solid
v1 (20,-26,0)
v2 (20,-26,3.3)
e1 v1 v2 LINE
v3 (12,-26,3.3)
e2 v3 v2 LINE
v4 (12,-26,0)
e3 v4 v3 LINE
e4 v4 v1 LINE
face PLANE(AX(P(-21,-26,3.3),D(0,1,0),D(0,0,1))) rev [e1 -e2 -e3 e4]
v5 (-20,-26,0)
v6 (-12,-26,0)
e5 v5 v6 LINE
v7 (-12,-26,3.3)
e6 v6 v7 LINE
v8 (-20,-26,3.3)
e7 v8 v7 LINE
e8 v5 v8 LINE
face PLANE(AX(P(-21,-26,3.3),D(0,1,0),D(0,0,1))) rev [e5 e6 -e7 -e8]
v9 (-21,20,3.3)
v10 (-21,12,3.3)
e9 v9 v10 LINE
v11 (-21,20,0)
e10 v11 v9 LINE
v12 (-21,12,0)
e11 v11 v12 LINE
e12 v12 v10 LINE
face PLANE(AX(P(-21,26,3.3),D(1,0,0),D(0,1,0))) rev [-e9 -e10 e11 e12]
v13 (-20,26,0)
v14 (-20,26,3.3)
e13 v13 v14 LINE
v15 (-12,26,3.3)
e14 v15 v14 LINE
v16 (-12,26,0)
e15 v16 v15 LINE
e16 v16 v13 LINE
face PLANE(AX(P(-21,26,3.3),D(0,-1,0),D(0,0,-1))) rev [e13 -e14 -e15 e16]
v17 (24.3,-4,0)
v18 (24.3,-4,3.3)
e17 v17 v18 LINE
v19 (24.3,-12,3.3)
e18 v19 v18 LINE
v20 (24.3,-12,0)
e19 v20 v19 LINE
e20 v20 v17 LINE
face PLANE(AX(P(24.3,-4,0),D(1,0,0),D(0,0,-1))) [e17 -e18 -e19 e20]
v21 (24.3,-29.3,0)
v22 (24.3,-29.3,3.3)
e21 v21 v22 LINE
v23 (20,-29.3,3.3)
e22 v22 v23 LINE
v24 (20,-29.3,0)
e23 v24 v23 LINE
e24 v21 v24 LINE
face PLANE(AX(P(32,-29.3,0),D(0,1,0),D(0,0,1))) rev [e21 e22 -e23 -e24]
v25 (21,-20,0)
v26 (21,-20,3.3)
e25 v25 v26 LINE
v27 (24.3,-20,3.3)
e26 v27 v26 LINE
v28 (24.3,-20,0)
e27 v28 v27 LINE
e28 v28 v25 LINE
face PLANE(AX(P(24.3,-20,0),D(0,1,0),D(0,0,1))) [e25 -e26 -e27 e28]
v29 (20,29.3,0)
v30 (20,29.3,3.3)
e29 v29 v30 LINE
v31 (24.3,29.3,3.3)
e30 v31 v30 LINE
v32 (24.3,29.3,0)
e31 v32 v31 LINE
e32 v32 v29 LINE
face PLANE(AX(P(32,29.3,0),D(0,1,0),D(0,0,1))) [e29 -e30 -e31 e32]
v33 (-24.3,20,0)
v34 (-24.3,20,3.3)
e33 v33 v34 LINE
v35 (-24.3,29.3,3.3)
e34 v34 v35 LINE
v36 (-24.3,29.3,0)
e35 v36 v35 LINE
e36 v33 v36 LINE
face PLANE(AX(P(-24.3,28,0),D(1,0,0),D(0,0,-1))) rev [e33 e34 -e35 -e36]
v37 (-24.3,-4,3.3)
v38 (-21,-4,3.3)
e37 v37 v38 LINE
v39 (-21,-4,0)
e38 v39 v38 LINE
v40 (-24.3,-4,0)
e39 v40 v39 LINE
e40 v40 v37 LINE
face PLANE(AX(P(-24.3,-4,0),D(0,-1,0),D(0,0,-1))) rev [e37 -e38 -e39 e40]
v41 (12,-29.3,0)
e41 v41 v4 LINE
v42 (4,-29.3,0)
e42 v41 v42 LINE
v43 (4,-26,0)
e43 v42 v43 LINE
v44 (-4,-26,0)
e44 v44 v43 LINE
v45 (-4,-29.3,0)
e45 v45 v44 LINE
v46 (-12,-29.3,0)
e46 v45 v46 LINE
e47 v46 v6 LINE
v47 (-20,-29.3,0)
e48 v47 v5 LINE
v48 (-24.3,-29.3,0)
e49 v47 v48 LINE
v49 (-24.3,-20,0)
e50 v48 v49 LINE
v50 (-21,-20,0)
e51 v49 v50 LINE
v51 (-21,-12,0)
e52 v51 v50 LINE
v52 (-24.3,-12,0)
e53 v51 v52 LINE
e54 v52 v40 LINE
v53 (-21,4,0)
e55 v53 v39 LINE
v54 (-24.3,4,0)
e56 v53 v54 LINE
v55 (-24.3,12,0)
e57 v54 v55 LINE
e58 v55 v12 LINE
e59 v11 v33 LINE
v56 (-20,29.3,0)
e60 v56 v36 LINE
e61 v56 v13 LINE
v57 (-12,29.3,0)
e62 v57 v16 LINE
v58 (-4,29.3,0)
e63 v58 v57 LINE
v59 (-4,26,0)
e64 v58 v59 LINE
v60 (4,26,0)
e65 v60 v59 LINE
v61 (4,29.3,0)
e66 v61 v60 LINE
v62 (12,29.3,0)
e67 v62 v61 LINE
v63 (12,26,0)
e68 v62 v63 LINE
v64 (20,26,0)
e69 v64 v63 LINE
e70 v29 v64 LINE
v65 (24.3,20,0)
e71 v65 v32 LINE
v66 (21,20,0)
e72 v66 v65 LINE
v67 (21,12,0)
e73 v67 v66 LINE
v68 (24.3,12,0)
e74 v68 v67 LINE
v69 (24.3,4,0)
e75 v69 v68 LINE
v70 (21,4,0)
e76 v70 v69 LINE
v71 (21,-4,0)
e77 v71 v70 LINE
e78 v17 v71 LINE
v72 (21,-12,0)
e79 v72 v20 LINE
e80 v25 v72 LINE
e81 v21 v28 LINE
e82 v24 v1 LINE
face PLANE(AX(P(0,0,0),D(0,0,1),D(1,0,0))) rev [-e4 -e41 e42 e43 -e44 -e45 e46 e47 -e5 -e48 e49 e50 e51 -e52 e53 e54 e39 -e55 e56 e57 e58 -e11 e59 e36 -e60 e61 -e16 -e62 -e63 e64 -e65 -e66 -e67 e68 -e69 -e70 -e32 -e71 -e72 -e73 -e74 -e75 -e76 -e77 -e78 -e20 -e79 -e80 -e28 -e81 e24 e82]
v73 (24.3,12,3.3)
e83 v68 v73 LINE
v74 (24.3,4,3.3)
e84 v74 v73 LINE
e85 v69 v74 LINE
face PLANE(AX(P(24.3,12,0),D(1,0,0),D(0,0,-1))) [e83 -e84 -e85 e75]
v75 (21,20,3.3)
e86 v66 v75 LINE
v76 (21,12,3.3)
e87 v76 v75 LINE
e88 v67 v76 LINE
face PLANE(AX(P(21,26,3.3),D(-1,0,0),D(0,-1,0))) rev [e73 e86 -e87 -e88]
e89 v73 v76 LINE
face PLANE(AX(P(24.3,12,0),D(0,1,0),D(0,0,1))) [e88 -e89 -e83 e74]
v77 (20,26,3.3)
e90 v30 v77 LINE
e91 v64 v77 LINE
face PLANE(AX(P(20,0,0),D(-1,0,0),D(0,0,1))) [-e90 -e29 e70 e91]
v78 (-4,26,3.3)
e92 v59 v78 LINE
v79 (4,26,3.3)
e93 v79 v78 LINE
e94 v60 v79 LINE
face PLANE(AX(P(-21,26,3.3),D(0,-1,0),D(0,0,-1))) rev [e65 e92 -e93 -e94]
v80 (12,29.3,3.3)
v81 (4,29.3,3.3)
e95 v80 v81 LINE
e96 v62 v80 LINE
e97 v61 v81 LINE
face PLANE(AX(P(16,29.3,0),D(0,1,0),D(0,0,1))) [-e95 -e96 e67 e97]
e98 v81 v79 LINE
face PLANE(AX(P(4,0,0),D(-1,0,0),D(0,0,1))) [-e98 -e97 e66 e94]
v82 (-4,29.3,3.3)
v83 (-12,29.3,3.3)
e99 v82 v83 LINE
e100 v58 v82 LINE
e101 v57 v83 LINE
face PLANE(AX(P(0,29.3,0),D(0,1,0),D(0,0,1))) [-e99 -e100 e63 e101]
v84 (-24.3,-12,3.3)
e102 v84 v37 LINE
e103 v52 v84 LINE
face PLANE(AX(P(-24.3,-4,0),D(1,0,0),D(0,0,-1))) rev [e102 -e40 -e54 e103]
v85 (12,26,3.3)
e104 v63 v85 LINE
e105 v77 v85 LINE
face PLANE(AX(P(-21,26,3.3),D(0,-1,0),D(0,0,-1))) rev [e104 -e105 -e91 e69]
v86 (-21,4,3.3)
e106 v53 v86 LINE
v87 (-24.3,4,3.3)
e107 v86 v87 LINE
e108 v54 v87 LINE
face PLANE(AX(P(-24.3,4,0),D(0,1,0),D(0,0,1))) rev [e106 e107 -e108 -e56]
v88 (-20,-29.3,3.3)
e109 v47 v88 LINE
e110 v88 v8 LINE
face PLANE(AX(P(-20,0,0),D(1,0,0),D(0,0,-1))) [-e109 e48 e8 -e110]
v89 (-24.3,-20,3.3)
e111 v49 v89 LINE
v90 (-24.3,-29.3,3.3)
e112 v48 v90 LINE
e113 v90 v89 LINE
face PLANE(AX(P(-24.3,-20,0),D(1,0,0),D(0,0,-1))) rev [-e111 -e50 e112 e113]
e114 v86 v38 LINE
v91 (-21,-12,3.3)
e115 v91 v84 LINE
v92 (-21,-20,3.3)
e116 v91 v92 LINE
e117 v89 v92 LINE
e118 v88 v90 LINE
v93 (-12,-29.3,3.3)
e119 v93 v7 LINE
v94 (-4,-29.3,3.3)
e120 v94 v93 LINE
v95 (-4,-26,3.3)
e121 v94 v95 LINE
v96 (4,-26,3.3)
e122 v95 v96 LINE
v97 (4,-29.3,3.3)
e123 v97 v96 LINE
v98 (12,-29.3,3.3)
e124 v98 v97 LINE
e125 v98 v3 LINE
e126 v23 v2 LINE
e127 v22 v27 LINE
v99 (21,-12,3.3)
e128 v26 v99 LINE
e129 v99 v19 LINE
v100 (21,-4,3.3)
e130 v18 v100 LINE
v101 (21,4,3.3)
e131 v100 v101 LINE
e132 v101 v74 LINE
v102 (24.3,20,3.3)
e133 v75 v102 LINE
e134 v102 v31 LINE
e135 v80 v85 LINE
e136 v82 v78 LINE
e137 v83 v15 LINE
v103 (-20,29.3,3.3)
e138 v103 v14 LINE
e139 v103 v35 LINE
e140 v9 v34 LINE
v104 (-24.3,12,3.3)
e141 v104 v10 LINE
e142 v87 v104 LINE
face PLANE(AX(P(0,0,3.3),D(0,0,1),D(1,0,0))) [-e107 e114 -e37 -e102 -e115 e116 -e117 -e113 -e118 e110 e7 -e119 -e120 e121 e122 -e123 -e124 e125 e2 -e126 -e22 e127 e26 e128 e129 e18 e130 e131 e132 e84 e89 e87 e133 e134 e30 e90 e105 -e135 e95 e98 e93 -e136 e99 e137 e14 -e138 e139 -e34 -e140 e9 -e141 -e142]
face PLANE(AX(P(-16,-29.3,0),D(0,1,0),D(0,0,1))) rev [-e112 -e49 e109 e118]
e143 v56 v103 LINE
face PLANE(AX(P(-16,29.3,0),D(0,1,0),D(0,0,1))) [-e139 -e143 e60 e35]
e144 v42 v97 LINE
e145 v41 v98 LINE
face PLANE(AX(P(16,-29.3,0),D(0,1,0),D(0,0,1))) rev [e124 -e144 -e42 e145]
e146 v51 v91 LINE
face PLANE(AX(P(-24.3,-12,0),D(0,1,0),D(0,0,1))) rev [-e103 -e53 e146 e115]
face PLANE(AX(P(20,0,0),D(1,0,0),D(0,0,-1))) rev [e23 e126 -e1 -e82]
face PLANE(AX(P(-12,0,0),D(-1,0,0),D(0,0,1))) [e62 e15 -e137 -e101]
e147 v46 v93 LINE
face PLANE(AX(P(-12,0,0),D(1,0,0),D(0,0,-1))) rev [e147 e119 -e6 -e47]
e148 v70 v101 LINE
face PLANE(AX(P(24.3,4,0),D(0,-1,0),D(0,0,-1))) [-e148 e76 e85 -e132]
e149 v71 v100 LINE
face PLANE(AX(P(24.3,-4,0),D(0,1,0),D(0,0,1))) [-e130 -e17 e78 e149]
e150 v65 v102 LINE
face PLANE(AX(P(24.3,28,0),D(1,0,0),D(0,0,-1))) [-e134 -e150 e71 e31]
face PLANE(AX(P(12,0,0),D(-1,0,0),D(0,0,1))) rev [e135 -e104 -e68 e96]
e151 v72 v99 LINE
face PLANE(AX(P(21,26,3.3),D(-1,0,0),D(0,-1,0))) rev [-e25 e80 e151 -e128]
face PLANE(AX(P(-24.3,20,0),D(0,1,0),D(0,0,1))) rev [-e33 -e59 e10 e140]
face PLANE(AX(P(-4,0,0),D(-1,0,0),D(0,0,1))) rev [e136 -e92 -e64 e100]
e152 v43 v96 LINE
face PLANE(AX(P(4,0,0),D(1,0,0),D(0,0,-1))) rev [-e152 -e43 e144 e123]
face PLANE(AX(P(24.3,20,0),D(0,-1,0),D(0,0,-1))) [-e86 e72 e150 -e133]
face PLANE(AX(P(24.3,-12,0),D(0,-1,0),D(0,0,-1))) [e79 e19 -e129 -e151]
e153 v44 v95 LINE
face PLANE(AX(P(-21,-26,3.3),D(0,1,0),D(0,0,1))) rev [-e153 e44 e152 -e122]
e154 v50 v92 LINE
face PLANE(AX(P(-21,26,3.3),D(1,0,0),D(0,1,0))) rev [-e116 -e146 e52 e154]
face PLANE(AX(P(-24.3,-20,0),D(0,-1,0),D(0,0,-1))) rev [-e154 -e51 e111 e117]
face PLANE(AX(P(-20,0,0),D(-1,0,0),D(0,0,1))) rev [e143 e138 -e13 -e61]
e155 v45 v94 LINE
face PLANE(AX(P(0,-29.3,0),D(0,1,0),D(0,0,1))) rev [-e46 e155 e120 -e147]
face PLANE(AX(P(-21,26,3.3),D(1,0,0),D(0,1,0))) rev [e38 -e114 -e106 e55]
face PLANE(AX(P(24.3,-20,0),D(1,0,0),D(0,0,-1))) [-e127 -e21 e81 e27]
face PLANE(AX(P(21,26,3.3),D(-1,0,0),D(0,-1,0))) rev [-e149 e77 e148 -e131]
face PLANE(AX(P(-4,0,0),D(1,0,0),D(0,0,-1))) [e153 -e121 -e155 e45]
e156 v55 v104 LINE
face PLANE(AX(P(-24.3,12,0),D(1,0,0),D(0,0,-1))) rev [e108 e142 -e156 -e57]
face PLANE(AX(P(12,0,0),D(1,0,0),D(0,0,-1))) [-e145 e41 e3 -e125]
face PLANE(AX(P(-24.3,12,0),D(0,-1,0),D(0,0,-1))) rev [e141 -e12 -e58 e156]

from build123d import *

# Parameters (mm, degrees)
ESQUISSE1_W                    = 42
ESQUISSE1_H                    = 52
BOSS_EXTRU_1_DEPTH             = 3.3
ESQUISSE3_W                    = 3.3
ESQUISSE3_H                    = 8
BOSS_EXTRU_2_DEPTH             = 3.3
R_P_TITION_LIN_AIRE1_COUNT     = 3
R_P_TITION_LIN_AIRE1_PITCH     = 16
R_P_TITION_LIN_AIRE1_COL_COUNT = 2
R_P_TITION_LIN_AIRE1_COL_PITCH = 16
SYM_TRIE1_COPY_1_SKETCH_W      = 3.3
SYM_TRIE1_COPY_1_SKETCH_H      = 8
SYM_TRIE1_COPY_1_DEPTH         = 3.3
SYM_TRIE1_COPY_2_SKETCH_W      = 3.3
SYM_TRIE1_COPY_2_SKETCH_H      = 8
SYM_TRIE1_COPY_2_DEPTH         = 3.3
SYM_TRIE1_COPY_3_SKETCH_W      = 3.3
SYM_TRIE1_COPY_3_SKETCH_H      = 8
SYM_TRIE1_COPY_3_DEPTH         = 3.3
ESQUISSE4_W                    = 8
ESQUISSE4_H                    = 3.3
BOSS_EXTRU_3_DEPTH             = 3.3
R_P_TITION_LIN_AIRE2_COUNT     = 3
R_P_TITION_LIN_AIRE2_PITCH     = 16
R_P_TITION_LIN_AIRE2_COL_COUNT = 2
R_P_TITION_LIN_AIRE2_COL_PITCH = 16
ESQUISSE5_W                    = 3.7
ESQUISSE5_H                    = 3.3
ENL_V_MAT_EXTRU_1_DEPTH        = 41.661775662
SYM_TRIE2_START                = -29.3
SYM_TRIE2_OUTLINE_W            = 4.3
SYM_TRIE2_OUTLINE_H            = 3.3
SYM_TRIE2_OUTLINE_W_2          = 8
SYM_TRIE2_DEPTH                = 3.3


# Read off the part's stored shape, not the designer's step: Symétrie2
with BuildPart() as part:
    # Esquisse1 → Boss.-Extru.1 (new body)
    with BuildSketch(Plane.XY):
        Rectangle(ESQUISSE1_W, ESQUISSE1_H)
    extrude(amount=BOSS_EXTRU_1_DEPTH)

    # Esquisse3 → Boss.-Extru.2 (add)
    with BuildSketch(Plane.XY.offset(3.3)):
        with Locations((22.65, -8)):
            Rectangle(ESQUISSE3_W, ESQUISSE3_H)
    boss_extru_2 = extrude(amount=-BOSS_EXTRU_2_DEPTH)

    # Répétition linéaire1: Boss.-Extru.2 ×3
    with Locations(*[(0, i * R_P_TITION_LIN_AIRE1_PITCH, 0) for i in range(1, R_P_TITION_LIN_AIRE1_COUNT)]):
        add(boss_extru_2)

    # Répétition linéaire1 col: Boss.-Extru.2 ×2
    with Locations(*[(0, -i * R_P_TITION_LIN_AIRE1_COL_PITCH, 0) for i in range(1, R_P_TITION_LIN_AIRE1_COL_COUNT)]):
        add(boss_extru_2)

    # Symétrie1: Boss.-Extru.2 across plane
    add(boss_extru_2.mirror(Plane(origin=(0, 0, 0), x_dir=(0, 0, 1), z_dir=(1, 0, 0))))

    # Symétrie1 copy 1 sketch → Symétrie1 copy 1 (add)
    with BuildSketch(Plane(origin=(0, 16, 3.3), x_dir=(-1, 0, 0), z_dir=(0, 0, 1))):
        with Locations((22.65, 8)):
            Rectangle(SYM_TRIE1_COPY_1_SKETCH_W, SYM_TRIE1_COPY_1_SKETCH_H)
    extrude(amount=-SYM_TRIE1_COPY_1_DEPTH)

    # Symétrie1 copy 2 sketch → Symétrie1 copy 2 (add)
    with BuildSketch(Plane(origin=(0, 32, 3.3), x_dir=(-1, 0, 0), z_dir=(0, 0, 1))):
        with Locations((22.65, 8)):
            Rectangle(SYM_TRIE1_COPY_2_SKETCH_W, SYM_TRIE1_COPY_2_SKETCH_H)
    extrude(amount=-SYM_TRIE1_COPY_2_DEPTH)

    # Symétrie1 copy 3 sketch → Symétrie1 copy 3 (add)
    with BuildSketch(Plane(origin=(0, -16, 3.3), x_dir=(-1, 0, 0), z_dir=(0, 0, 1))):
        with Locations((22.65, 8)):
            Rectangle(SYM_TRIE1_COPY_3_SKETCH_W, SYM_TRIE1_COPY_3_SKETCH_H)
    extrude(amount=-SYM_TRIE1_COPY_3_DEPTH)

    # Esquisse4 → Boss.-Extru.3 (add)
    with BuildSketch(Plane.XY.offset(3.3)):
        with Locations((-8, 27.65)):
            Rectangle(ESQUISSE4_W, ESQUISSE4_H)
    boss_extru_3 = extrude(amount=-BOSS_EXTRU_3_DEPTH)

    # Répétition linéaire2: Boss.-Extru.3 ×3
    with Locations(*[(i * R_P_TITION_LIN_AIRE2_PITCH, 0, 0) for i in range(1, R_P_TITION_LIN_AIRE2_COUNT)]):
        add(boss_extru_3)

    # Répétition linéaire2 col: Boss.-Extru.3 ×2
    with Locations(*[(-i * R_P_TITION_LIN_AIRE2_COL_PITCH, 0, 0) for i in range(1, R_P_TITION_LIN_AIRE2_COL_COUNT)]):
        add(boss_extru_3)

    # Esquisse5 → Enlèv. mat.-Extru.1 (cut, symmetric)
    with BuildSketch(Plane.XY.offset(3.3)):
        with Locations((-26.15, 27.65)):
            Rectangle(ESQUISSE5_W, ESQUISSE5_H)
        with Locations((26.15, 27.65)):
            Rectangle(ESQUISSE5_W, ESQUISSE5_H)
    extrude(amount=ENL_V_MAT_EXTRU_1_DEPTH, both=True, mode=Mode.SUBTRACT)

    # Symétrie2 outline → Symétrie2 (add)
    with BuildSketch(Plane(origin=(0, 0, 0), x_dir=(1, 0, 0), z_dir=(0, 1, 0)).offset(SYM_TRIE2_START)):
        with Locations((22.15, -1.65)):
            Rectangle(SYM_TRIE2_OUTLINE_W, SYM_TRIE2_OUTLINE_H)
        with Locations((8, -1.65)):
            Rectangle(SYM_TRIE2_OUTLINE_W_2, SYM_TRIE2_OUTLINE_H)
        with Locations((-8, -1.65)):
            Rectangle(SYM_TRIE2_OUTLINE_W_2, SYM_TRIE2_OUTLINE_H)
        with Locations((-22.15, -1.65)):
            Rectangle(SYM_TRIE2_OUTLINE_W, SYM_TRIE2_OUTLINE_H)
    extrude(amount=SYM_TRIE2_DEPTH)


solid = part.part
